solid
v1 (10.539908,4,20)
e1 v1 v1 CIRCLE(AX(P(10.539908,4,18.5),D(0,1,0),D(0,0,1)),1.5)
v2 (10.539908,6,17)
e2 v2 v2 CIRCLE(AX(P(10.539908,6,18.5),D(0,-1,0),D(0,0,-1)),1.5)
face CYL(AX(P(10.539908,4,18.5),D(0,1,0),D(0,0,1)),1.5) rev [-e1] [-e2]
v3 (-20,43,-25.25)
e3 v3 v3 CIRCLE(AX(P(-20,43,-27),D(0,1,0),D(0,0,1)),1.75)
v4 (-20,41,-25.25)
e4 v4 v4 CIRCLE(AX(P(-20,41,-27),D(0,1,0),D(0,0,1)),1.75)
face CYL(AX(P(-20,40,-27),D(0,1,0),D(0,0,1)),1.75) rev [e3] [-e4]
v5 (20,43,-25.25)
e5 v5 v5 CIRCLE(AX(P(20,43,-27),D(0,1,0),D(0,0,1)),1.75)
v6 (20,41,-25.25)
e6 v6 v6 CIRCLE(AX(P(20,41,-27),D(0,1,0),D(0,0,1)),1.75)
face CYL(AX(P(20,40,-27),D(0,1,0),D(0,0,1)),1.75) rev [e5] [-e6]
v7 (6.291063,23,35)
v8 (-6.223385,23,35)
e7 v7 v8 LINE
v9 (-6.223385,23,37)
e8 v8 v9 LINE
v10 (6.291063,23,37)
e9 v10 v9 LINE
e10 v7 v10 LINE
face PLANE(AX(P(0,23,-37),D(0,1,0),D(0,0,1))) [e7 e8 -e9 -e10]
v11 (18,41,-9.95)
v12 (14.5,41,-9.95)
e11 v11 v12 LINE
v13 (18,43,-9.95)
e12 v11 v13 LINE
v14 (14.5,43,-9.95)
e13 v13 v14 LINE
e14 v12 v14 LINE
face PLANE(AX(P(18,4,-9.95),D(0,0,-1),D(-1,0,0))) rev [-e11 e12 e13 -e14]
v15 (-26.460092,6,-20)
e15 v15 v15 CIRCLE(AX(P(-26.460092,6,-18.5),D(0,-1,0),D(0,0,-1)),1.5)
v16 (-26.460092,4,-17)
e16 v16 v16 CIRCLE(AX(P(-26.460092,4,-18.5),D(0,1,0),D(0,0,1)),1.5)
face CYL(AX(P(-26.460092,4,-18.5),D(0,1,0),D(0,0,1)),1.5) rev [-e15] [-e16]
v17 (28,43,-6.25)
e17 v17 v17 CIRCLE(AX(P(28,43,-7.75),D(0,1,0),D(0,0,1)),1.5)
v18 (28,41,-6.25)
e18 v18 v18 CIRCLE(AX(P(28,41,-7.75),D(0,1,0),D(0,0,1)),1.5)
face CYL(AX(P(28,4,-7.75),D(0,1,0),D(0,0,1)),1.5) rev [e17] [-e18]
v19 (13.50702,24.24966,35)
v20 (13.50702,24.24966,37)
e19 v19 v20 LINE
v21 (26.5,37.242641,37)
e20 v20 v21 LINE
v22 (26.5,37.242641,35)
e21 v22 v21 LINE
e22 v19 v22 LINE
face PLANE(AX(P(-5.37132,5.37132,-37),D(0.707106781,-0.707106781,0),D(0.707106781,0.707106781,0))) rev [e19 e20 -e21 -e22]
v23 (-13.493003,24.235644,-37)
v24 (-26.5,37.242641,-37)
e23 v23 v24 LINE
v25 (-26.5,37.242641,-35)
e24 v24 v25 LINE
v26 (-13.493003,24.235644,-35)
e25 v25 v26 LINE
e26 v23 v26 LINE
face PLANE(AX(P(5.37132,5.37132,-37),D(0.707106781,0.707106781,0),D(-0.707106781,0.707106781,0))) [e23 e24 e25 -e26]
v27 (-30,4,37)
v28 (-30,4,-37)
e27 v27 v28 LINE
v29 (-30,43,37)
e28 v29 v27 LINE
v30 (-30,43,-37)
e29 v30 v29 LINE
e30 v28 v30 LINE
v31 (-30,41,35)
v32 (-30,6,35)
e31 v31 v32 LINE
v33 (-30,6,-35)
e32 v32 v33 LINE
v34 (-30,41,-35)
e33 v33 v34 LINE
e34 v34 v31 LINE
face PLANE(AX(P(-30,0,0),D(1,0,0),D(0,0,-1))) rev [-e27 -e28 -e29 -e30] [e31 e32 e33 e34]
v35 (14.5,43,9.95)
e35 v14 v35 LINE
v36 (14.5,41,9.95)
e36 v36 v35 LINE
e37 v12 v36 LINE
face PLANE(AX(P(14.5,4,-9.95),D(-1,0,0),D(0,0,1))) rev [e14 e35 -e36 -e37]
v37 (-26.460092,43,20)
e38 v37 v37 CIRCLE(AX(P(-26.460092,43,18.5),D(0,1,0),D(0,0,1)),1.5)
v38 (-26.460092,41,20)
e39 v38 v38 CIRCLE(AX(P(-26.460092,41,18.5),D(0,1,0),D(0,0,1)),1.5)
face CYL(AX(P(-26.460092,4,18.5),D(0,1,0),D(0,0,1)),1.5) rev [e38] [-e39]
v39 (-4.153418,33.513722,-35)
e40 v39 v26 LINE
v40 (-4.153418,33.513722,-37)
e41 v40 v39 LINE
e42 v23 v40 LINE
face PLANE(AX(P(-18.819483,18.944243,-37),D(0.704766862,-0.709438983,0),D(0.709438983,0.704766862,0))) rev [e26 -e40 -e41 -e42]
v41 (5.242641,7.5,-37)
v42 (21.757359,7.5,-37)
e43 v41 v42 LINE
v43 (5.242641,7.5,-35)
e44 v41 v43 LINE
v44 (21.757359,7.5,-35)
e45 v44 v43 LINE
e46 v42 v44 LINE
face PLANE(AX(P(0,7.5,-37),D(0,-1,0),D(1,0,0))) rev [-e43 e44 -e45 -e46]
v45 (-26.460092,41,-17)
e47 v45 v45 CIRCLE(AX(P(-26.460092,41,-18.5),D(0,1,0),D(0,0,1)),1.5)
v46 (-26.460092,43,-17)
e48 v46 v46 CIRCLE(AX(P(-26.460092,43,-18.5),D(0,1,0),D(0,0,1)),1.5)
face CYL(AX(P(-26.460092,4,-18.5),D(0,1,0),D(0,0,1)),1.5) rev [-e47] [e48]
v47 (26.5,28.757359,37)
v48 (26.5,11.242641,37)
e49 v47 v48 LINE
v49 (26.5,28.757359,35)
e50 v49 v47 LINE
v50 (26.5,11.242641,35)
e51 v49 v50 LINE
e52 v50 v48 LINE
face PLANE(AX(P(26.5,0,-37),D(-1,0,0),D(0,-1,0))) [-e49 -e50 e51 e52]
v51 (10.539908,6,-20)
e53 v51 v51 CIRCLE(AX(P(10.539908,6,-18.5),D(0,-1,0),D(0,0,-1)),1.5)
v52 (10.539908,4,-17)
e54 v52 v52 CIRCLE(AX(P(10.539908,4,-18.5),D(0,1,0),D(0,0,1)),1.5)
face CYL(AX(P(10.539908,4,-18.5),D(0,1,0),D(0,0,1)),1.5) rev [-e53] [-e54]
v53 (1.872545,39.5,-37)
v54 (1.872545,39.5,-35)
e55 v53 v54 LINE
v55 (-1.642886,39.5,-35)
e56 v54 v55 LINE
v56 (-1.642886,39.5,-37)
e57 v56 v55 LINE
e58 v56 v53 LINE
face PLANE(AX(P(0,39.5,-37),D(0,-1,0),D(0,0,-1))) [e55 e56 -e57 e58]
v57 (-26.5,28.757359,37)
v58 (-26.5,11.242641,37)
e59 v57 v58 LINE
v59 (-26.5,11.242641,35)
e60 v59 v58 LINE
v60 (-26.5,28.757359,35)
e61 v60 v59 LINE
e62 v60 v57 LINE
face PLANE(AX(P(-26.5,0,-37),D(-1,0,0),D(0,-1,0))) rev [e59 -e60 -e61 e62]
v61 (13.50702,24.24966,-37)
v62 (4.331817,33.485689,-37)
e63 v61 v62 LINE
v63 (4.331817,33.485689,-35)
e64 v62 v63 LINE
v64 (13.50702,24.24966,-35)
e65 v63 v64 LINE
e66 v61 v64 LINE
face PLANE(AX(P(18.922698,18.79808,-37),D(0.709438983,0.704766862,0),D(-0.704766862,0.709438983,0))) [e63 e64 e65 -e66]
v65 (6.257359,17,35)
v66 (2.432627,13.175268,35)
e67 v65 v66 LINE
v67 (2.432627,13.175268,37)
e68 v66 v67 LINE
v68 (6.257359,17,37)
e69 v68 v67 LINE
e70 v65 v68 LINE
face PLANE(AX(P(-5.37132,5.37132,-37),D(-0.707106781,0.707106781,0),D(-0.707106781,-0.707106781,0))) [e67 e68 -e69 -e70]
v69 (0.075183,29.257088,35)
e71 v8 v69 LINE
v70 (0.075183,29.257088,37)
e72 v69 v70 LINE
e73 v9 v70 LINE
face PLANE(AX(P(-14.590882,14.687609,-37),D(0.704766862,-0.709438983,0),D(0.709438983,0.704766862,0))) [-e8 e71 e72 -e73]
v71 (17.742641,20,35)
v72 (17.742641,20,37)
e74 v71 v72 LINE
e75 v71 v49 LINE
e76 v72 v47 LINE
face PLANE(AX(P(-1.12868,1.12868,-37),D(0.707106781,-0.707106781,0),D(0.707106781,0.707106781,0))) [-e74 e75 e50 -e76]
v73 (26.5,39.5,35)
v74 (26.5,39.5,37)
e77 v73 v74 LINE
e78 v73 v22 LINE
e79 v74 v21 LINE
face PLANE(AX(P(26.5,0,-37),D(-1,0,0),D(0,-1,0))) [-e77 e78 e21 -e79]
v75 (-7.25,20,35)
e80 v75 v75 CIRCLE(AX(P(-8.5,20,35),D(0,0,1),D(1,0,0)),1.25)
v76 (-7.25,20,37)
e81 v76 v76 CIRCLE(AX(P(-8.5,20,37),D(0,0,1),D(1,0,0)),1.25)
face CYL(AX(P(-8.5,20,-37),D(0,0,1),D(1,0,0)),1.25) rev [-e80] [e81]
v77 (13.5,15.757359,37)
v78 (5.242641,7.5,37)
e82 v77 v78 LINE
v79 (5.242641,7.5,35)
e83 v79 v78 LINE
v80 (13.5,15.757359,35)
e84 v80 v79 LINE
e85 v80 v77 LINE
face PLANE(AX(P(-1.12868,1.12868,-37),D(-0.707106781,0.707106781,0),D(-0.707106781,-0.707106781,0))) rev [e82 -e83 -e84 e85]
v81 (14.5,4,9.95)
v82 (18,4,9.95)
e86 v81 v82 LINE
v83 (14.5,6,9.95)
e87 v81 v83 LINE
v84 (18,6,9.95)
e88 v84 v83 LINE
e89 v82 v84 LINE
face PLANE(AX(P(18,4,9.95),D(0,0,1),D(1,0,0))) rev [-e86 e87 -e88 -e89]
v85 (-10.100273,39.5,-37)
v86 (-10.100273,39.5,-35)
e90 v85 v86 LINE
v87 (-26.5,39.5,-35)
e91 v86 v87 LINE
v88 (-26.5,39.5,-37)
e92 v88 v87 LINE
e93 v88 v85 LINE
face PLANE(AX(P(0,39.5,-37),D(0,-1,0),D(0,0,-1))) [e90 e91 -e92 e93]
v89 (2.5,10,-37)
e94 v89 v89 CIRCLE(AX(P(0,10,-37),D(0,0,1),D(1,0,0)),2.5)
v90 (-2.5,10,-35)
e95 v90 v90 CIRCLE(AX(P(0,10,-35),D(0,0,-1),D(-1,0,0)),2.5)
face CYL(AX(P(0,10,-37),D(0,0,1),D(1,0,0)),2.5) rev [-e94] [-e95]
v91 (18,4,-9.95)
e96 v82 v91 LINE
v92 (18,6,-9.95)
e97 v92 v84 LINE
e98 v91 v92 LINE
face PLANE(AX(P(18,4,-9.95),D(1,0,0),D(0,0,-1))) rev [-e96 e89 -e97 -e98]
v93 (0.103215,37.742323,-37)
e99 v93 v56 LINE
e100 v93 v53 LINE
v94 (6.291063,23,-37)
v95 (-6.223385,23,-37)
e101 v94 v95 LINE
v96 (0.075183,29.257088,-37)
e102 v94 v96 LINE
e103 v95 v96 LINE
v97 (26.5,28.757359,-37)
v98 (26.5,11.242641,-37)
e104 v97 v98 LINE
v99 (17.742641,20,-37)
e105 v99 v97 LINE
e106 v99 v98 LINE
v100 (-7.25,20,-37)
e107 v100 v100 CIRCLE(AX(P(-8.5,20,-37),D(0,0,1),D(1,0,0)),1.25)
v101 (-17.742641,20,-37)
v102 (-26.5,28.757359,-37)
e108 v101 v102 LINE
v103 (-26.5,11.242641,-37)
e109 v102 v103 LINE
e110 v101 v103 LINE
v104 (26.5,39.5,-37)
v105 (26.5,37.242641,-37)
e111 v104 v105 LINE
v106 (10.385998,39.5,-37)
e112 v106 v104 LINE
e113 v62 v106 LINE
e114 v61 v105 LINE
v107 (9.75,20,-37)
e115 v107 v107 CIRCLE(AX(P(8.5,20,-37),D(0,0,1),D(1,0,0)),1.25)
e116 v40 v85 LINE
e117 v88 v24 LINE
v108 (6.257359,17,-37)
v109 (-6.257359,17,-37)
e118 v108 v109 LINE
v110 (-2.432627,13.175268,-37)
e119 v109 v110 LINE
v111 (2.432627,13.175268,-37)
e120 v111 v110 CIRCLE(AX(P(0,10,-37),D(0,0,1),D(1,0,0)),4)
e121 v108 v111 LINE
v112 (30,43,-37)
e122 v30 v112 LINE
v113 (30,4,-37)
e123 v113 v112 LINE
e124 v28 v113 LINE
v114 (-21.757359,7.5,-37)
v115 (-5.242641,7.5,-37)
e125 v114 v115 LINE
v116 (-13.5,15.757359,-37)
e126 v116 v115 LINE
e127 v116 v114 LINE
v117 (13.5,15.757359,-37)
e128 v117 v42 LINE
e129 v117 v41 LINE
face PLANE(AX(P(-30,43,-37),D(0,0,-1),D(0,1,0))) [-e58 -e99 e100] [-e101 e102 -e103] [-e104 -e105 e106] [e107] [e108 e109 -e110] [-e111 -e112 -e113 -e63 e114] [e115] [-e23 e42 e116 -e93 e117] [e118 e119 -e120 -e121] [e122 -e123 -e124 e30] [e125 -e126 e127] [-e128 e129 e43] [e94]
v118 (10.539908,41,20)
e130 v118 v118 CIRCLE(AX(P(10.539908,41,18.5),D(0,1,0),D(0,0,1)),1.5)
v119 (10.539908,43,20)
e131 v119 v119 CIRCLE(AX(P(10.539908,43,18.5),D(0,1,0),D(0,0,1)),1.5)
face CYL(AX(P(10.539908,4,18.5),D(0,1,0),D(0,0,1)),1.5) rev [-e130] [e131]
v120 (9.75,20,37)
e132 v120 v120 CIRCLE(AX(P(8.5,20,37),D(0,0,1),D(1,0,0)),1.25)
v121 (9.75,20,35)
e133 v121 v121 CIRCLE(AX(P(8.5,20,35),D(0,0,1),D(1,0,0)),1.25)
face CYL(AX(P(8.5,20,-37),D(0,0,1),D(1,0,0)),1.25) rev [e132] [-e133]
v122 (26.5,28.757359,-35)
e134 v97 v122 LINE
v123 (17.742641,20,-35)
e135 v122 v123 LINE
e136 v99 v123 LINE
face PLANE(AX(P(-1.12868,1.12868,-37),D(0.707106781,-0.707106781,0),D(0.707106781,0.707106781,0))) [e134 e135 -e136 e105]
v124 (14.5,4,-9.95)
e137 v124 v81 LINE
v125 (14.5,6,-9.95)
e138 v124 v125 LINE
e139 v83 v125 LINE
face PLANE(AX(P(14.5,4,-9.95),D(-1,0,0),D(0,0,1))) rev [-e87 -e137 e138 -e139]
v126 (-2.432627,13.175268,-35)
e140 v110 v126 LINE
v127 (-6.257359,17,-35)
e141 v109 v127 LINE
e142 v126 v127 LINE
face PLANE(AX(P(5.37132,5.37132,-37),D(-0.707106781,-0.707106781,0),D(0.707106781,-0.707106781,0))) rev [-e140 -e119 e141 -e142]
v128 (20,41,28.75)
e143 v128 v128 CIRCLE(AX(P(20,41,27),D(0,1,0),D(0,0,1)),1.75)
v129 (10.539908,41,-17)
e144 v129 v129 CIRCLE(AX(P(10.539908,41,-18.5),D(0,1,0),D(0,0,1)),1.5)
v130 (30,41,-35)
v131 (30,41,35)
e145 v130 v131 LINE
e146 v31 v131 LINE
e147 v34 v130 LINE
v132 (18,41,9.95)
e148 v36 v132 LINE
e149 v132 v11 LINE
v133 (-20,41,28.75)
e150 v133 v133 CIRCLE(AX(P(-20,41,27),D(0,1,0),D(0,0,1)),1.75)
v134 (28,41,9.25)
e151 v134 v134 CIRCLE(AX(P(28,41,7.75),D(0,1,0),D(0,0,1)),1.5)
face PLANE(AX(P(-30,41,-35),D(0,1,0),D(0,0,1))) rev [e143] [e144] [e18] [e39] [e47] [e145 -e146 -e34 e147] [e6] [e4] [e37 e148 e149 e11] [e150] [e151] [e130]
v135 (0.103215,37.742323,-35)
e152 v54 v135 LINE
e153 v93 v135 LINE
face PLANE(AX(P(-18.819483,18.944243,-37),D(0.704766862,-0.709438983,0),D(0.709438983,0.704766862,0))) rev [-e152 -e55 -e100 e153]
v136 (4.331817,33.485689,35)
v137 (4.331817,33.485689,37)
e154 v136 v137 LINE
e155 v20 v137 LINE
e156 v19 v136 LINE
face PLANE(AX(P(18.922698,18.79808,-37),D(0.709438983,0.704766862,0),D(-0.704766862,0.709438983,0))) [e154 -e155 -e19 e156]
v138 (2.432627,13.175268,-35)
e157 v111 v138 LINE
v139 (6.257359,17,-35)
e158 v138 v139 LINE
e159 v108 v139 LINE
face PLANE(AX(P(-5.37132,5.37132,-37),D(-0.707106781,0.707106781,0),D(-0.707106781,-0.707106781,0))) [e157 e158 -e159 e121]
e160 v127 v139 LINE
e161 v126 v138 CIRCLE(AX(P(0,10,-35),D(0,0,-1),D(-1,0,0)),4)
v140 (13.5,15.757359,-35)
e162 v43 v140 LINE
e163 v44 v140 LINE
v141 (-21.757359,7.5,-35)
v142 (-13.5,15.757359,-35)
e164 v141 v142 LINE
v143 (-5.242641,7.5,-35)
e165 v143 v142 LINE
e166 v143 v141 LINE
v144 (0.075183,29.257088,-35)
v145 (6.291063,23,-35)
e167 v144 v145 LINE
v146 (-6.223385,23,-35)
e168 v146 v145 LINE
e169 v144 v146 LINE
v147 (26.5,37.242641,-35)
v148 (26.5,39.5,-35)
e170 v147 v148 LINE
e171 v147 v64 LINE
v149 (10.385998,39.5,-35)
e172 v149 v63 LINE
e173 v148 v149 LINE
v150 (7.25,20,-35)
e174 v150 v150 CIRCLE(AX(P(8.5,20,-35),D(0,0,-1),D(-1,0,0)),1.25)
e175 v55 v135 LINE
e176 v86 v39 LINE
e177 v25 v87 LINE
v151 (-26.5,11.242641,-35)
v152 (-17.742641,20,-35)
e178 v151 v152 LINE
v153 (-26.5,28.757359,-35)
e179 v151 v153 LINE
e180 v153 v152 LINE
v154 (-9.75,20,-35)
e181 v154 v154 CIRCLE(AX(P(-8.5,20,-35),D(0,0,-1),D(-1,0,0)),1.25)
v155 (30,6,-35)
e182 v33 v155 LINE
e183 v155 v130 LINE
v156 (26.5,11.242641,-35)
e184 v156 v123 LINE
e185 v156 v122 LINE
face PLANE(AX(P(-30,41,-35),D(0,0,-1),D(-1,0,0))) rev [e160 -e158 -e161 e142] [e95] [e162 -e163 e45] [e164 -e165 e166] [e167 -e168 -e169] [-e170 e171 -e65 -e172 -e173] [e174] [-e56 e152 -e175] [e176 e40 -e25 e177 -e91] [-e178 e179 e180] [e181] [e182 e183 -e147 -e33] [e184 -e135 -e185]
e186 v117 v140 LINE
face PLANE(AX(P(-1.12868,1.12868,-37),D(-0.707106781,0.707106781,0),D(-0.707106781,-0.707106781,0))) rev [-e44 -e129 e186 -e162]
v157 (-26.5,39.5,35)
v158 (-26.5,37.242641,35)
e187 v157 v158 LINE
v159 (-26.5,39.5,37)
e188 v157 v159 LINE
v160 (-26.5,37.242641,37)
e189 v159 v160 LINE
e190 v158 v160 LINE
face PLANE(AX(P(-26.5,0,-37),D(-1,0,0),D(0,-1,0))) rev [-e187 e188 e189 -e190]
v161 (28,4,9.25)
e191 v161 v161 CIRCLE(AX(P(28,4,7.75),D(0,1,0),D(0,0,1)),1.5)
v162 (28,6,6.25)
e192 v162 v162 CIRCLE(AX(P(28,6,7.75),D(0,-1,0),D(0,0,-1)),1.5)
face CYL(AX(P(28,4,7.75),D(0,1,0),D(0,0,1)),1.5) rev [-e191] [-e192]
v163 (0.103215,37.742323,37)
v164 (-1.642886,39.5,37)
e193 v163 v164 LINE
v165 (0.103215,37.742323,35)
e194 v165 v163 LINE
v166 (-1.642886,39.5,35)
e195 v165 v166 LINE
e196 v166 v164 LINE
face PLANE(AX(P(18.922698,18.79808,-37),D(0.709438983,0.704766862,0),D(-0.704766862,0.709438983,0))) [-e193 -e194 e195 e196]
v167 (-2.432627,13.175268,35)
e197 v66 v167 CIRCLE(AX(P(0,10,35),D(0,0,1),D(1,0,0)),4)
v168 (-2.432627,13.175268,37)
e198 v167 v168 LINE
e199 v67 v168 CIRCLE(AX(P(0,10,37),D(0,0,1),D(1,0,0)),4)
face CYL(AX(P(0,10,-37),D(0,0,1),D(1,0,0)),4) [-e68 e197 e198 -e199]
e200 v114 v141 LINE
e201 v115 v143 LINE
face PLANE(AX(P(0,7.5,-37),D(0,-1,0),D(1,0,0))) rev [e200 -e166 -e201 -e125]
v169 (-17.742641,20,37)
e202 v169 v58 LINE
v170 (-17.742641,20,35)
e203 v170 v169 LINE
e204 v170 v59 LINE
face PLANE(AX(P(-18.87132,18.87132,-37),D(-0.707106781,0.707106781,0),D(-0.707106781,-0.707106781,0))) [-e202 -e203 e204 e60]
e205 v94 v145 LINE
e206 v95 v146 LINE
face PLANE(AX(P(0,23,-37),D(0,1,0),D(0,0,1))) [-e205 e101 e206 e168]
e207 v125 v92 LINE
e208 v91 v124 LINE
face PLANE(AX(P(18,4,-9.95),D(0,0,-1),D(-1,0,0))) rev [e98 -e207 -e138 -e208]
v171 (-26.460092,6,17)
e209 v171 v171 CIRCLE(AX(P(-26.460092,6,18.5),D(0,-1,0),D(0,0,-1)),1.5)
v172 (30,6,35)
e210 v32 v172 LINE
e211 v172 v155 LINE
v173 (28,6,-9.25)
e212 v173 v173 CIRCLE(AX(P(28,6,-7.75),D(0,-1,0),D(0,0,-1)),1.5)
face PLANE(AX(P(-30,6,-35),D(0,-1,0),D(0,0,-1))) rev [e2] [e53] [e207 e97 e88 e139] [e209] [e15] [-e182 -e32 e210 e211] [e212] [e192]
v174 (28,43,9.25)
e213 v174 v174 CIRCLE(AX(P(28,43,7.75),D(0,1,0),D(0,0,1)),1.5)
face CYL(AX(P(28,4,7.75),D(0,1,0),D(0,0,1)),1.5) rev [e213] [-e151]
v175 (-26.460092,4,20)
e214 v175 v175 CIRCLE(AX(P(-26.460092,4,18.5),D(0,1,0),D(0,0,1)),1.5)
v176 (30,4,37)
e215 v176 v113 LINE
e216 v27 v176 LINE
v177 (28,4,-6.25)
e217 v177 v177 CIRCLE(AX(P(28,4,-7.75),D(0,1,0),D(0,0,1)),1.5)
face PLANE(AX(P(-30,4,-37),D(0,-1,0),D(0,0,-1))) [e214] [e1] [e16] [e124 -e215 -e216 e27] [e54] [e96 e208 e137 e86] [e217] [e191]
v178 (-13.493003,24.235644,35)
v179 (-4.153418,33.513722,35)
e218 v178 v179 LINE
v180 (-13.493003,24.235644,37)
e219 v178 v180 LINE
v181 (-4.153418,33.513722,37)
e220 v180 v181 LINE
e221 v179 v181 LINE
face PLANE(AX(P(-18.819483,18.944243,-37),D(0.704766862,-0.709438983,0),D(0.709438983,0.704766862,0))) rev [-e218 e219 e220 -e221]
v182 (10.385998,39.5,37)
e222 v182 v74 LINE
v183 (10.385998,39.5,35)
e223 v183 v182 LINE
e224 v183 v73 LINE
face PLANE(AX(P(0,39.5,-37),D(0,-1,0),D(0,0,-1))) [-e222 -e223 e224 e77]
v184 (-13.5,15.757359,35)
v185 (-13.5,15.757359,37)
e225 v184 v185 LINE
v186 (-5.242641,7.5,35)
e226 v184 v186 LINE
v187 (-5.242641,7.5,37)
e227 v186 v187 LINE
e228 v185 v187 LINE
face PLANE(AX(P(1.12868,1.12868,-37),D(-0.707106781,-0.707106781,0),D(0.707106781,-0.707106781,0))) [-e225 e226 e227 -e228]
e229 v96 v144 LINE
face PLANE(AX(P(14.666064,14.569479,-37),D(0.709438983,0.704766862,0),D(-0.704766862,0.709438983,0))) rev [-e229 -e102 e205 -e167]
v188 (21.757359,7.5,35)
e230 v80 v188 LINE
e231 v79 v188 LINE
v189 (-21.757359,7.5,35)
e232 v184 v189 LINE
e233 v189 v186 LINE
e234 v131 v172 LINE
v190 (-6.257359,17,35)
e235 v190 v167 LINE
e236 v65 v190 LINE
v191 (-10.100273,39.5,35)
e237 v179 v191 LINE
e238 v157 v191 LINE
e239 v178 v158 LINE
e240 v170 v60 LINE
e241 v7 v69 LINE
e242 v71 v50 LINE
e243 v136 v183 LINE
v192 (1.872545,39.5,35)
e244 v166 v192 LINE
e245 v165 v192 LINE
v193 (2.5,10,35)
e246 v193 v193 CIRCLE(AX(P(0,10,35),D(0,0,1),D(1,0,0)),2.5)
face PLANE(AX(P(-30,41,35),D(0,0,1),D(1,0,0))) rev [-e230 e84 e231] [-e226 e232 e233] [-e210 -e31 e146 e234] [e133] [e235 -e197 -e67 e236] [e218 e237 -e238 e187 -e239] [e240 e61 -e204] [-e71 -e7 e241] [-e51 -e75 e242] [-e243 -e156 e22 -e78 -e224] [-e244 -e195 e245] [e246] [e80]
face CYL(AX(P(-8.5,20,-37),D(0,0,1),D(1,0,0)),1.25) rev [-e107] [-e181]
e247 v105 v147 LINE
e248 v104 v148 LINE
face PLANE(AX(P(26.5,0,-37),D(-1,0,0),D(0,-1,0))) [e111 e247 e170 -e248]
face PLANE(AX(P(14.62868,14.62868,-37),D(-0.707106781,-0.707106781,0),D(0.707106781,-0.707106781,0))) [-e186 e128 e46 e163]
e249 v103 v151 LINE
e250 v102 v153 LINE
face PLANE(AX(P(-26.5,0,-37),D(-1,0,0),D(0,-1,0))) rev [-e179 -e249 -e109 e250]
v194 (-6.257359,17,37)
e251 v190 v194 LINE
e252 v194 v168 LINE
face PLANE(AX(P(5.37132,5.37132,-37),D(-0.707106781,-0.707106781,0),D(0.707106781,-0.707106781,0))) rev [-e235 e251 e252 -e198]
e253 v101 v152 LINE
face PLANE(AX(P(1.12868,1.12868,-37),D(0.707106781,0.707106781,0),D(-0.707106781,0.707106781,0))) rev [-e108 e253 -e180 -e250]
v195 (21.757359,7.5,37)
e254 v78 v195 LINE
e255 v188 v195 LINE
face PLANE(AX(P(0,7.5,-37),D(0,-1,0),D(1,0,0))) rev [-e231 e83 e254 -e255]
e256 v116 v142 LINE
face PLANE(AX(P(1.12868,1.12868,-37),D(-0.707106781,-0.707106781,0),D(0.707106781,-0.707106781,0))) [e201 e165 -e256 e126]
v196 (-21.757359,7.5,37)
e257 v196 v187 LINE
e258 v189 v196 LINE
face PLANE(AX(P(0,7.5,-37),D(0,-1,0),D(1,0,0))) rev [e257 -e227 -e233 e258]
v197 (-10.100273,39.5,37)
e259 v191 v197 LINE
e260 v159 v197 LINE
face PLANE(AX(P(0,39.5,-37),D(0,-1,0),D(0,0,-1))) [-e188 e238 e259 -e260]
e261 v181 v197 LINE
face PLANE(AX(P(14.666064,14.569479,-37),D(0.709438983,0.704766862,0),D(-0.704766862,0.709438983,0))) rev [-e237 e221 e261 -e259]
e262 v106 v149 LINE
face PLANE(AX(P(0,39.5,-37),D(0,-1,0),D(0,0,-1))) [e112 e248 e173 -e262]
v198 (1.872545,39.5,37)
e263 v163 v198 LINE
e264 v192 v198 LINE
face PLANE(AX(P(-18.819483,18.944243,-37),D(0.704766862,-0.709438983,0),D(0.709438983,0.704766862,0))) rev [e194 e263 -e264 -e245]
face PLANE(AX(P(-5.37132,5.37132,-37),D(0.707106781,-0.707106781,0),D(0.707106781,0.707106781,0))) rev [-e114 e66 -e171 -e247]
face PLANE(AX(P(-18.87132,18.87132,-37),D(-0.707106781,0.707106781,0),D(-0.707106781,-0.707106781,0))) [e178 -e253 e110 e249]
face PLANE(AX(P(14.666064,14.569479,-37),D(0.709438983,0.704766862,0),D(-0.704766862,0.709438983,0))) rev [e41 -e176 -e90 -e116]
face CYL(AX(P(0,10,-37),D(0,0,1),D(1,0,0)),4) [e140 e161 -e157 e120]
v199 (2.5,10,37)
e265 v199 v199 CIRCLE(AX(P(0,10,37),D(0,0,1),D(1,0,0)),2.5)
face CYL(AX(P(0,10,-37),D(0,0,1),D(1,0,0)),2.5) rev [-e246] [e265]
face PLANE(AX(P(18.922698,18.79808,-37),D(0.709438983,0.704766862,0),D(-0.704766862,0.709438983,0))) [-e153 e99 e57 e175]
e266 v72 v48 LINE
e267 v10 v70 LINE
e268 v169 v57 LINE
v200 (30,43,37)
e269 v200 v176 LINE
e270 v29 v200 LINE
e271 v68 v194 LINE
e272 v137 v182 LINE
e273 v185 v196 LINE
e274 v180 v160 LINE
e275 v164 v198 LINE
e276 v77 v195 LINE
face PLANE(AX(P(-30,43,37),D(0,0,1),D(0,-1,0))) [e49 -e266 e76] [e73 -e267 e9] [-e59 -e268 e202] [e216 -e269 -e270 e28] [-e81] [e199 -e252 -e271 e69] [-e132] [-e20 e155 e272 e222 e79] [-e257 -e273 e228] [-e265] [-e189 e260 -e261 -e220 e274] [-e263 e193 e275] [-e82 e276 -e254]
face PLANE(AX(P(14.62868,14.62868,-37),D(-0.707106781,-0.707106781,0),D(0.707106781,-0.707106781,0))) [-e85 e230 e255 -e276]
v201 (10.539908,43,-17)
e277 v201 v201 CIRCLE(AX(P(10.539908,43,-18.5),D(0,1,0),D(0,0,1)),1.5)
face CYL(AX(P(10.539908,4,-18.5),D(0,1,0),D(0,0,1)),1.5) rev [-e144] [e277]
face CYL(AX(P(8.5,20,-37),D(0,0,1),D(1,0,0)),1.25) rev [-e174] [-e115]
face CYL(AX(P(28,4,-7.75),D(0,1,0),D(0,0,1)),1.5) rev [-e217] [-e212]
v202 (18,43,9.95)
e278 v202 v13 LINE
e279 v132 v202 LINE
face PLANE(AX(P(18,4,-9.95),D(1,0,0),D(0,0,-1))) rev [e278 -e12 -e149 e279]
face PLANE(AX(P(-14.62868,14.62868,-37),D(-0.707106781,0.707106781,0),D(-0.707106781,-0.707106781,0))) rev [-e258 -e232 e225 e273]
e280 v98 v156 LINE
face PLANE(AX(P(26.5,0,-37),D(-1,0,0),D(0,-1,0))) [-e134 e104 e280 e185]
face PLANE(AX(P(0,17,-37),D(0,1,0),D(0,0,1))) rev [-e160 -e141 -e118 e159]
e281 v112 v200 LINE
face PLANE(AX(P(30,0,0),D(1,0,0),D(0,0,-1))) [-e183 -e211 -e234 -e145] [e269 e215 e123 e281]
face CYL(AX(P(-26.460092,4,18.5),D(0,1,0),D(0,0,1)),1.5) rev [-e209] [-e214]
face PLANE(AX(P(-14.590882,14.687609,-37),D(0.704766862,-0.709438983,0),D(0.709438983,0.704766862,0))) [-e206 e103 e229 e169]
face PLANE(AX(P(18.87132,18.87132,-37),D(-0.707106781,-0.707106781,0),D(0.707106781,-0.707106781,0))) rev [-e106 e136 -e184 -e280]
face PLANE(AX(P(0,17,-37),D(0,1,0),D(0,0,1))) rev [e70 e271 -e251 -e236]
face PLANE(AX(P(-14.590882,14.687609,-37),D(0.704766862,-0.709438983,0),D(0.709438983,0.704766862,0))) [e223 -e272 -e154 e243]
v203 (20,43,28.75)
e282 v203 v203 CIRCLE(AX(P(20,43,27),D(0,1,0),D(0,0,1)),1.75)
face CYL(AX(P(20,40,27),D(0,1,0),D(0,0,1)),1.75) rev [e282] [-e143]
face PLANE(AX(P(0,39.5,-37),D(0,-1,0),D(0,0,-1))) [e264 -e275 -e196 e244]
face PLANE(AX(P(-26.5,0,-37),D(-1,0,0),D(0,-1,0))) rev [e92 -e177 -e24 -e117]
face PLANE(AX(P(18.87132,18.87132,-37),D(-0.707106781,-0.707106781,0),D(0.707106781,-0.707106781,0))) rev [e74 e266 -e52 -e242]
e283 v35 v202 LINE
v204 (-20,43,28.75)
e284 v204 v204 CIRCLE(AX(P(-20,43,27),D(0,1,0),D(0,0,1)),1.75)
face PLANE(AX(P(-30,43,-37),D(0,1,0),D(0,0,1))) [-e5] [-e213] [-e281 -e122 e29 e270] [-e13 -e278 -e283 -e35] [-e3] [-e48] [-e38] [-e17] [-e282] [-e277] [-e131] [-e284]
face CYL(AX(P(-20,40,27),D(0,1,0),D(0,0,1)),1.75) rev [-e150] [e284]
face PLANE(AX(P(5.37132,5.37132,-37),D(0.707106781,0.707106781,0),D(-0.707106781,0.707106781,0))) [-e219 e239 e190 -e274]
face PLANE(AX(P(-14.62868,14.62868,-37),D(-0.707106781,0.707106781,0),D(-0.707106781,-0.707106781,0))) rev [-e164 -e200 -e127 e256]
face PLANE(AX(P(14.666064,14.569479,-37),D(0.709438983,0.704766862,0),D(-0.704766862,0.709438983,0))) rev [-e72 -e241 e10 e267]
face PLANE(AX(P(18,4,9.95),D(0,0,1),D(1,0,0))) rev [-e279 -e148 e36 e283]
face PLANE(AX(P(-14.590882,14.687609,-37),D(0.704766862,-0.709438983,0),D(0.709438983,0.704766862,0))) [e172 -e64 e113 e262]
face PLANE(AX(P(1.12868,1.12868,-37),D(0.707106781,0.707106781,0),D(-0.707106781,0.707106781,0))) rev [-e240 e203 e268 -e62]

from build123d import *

# Parameters (mm, degrees)
BOSS_EXTRUDE1_DEPTH      = 30
BOSS_EXTRUDE1_DEPTH_BACK = 30
SKETCH2_W                = 74
SKETCH2_H                = 39
SKETCH2_W_2              = 70
SKETCH2_H_2              = 35
CUT_EXTRUDE1_DEPTH       = 65.171644829
CUT_EXTRUDE1_DEPTH_BACK  = 65.171644829
SKETCH1_R                = 1.25
SKETCH1_R_2              = 2.5
CUT_EXTRUDE2_START       = -37
CUT_EXTRUDE2_DEPTH       = 74
SKETCH4_R                = 1.75
CUT_EXTRUDE3_DEPTH       = 3
CUT_EXTRUDE4_DEPTH       = 61.3158354
CUT_EXTRUDE4_DEPTH_BACK  = 61.3158354
SKETCH5_R                = 1.5
SKETCH5_W                = 3.5
SKETCH5_H                = 19.9


# Read off the part's stored shape, not the designer's step: Cut-Extrude2
with BuildPart() as part:
    # Sketch2 → Boss-Extrude1 (new, two sides: drawn at the far end of the back side and taken through both)
    with BuildSketch(Plane(origin=(0, 0, 0), x_dir=(0, 0, -1), z_dir=(1, 0, 0)).offset(-BOSS_EXTRUDE1_DEPTH_BACK)):
        with Locations((0, 23.5)):
            Rectangle(SKETCH2_W, SKETCH2_H)
        with Locations((0, 23.5)):
            Rectangle(SKETCH2_W_2, SKETCH2_H_2, mode=Mode.SUBTRACT)
    extrude(amount=BOSS_EXTRUDE1_DEPTH + BOSS_EXTRUDE1_DEPTH_BACK)

    # Sketch1 → Cut-Extrude1 (cut, two sides: drawn at the far end of the back side and taken through both)
    with BuildSketch(Plane.XY.offset(-CUT_EXTRUDE1_DEPTH_BACK)):
        with Locations((8.5, 20)):
            Circle(SKETCH1_R)
        with Locations((-8.5, 20)):
            Circle(SKETCH1_R)
        with Locations((0, 10)):
            Circle(SKETCH1_R_2)
    extrude(amount=CUT_EXTRUDE1_DEPTH + CUT_EXTRUDE1_DEPTH_BACK, mode=Mode.SUBTRACT)

    # Cut-Extrude2 outline → Cut-Extrude2 (cut)
    with BuildSketch(Plane.XY.offset(CUT_EXTRUDE2_START)):
        Polygon((-6.223385238, 23), (6.291063493, 23), (0.075182746, 29.257087778), align=None)
        Polygon((-13.493003356, 24.235644043), (-4.153418424, 33.513721677), (-10.100273174, 39.5), (-26.5, 39.5), (-26.5, 37.242640687), align=None)
        Polygon((10.385998459, 39.5), (4.331816644, 33.485688948), (13.507019797, 24.249660484), (26.5, 37.242640687), (26.5, 39.5), align=None)
        Polygon((21.757359313, 7.5), (13.5, 15.757359313), (5.242640687, 7.5), align=None)
        Polygon((26.5, 28.757359313), (17.742640687, 20), (26.5, 11.242640687), align=None)
        Polygon((-13.5, 15.757359313), (-21.757359313, 7.5), (-5.242640687, 7.5), align=None)
        with BuildLine():
            Line((2.432627089, 13.175267776), (6.257359313, 17))
            Line((6.257359313, 17), (-6.257359313, 17))
            Line((-6.257359313, 17), (-2.432627089, 13.175267776))
            ThreePointArc((-2.432627089, 13.175267776), (0, 14), (2.432627089, 13.175267776))
        make_face()
        Polygon((-26.5, 11.242640687), (-17.742640687, 20), (-26.5, 28.757359313), align=None)
        Polygon((1.872544824, 39.5), (-1.642886221, 39.5), (0.103215475, 37.742322846), align=None)
    extrude(amount=CUT_EXTRUDE2_DEPTH, mode=Mode.SUBTRACT)

    # Sketch4 → Cut-Extrude3 (cut)
    with BuildSketch(Plane(origin=(0, 43, 0), x_dir=(1, 0, 0), z_dir=(0, 1, 0))):
        with Locations(Location((-20, 27, 0), (0, 0, 270))):
            Circle(SKETCH4_R)
        with Locations(Location((20, 27, 0), (0, 0, 270))):
            Circle(SKETCH4_R)
        with Locations(Location((20, -27, 0), (0, 0, 270))):
            Circle(SKETCH4_R)
        with Locations(Location((-20, -27, 0), (0, 0, 270))):
            Circle(SKETCH4_R)
    extrude(amount=-CUT_EXTRUDE3_DEPTH, mode=Mode.SUBTRACT)

    # Sketch5 → Cut-Extrude4 (cut, two sides: drawn at the far end of the back side and taken through both)
    with BuildSketch(Plane(origin=(0, 6, 0), x_dir=(1, 0, 0), z_dir=(0, 1, 0)).offset(-CUT_EXTRUDE4_DEPTH_BACK)):
        with Locations(Location((-26.460092097, -18.5, 0), (0, 0, 270))):
            Circle(SKETCH5_R)
        with Locations(Location((-26.460092097, 18.5, 0), (0, 0, 270))):
            Circle(SKETCH5_R)
        with Locations(Location((10.539907903, 18.5, 0), (0, 0, 270))):
            Circle(SKETCH5_R)
        with Locations(Location((10.539907903, -18.5, 0), (0, 0, 270))):
            Circle(SKETCH5_R)
        with Locations(Location((28, -7.75, 0), (0, 0, 270))):
            Circle(SKETCH5_R)
        with Locations(Location((28, 7.75, 0), (0, 0, 270))):
            Circle(SKETCH5_R)
        with Locations((16.25, 0)):
            Rectangle(SKETCH5_W, SKETCH5_H)
    extrude(amount=CUT_EXTRUDE4_DEPTH + CUT_EXTRUDE4_DEPTH_BACK, mode=Mode.SUBTRACT)


solid = part.part
